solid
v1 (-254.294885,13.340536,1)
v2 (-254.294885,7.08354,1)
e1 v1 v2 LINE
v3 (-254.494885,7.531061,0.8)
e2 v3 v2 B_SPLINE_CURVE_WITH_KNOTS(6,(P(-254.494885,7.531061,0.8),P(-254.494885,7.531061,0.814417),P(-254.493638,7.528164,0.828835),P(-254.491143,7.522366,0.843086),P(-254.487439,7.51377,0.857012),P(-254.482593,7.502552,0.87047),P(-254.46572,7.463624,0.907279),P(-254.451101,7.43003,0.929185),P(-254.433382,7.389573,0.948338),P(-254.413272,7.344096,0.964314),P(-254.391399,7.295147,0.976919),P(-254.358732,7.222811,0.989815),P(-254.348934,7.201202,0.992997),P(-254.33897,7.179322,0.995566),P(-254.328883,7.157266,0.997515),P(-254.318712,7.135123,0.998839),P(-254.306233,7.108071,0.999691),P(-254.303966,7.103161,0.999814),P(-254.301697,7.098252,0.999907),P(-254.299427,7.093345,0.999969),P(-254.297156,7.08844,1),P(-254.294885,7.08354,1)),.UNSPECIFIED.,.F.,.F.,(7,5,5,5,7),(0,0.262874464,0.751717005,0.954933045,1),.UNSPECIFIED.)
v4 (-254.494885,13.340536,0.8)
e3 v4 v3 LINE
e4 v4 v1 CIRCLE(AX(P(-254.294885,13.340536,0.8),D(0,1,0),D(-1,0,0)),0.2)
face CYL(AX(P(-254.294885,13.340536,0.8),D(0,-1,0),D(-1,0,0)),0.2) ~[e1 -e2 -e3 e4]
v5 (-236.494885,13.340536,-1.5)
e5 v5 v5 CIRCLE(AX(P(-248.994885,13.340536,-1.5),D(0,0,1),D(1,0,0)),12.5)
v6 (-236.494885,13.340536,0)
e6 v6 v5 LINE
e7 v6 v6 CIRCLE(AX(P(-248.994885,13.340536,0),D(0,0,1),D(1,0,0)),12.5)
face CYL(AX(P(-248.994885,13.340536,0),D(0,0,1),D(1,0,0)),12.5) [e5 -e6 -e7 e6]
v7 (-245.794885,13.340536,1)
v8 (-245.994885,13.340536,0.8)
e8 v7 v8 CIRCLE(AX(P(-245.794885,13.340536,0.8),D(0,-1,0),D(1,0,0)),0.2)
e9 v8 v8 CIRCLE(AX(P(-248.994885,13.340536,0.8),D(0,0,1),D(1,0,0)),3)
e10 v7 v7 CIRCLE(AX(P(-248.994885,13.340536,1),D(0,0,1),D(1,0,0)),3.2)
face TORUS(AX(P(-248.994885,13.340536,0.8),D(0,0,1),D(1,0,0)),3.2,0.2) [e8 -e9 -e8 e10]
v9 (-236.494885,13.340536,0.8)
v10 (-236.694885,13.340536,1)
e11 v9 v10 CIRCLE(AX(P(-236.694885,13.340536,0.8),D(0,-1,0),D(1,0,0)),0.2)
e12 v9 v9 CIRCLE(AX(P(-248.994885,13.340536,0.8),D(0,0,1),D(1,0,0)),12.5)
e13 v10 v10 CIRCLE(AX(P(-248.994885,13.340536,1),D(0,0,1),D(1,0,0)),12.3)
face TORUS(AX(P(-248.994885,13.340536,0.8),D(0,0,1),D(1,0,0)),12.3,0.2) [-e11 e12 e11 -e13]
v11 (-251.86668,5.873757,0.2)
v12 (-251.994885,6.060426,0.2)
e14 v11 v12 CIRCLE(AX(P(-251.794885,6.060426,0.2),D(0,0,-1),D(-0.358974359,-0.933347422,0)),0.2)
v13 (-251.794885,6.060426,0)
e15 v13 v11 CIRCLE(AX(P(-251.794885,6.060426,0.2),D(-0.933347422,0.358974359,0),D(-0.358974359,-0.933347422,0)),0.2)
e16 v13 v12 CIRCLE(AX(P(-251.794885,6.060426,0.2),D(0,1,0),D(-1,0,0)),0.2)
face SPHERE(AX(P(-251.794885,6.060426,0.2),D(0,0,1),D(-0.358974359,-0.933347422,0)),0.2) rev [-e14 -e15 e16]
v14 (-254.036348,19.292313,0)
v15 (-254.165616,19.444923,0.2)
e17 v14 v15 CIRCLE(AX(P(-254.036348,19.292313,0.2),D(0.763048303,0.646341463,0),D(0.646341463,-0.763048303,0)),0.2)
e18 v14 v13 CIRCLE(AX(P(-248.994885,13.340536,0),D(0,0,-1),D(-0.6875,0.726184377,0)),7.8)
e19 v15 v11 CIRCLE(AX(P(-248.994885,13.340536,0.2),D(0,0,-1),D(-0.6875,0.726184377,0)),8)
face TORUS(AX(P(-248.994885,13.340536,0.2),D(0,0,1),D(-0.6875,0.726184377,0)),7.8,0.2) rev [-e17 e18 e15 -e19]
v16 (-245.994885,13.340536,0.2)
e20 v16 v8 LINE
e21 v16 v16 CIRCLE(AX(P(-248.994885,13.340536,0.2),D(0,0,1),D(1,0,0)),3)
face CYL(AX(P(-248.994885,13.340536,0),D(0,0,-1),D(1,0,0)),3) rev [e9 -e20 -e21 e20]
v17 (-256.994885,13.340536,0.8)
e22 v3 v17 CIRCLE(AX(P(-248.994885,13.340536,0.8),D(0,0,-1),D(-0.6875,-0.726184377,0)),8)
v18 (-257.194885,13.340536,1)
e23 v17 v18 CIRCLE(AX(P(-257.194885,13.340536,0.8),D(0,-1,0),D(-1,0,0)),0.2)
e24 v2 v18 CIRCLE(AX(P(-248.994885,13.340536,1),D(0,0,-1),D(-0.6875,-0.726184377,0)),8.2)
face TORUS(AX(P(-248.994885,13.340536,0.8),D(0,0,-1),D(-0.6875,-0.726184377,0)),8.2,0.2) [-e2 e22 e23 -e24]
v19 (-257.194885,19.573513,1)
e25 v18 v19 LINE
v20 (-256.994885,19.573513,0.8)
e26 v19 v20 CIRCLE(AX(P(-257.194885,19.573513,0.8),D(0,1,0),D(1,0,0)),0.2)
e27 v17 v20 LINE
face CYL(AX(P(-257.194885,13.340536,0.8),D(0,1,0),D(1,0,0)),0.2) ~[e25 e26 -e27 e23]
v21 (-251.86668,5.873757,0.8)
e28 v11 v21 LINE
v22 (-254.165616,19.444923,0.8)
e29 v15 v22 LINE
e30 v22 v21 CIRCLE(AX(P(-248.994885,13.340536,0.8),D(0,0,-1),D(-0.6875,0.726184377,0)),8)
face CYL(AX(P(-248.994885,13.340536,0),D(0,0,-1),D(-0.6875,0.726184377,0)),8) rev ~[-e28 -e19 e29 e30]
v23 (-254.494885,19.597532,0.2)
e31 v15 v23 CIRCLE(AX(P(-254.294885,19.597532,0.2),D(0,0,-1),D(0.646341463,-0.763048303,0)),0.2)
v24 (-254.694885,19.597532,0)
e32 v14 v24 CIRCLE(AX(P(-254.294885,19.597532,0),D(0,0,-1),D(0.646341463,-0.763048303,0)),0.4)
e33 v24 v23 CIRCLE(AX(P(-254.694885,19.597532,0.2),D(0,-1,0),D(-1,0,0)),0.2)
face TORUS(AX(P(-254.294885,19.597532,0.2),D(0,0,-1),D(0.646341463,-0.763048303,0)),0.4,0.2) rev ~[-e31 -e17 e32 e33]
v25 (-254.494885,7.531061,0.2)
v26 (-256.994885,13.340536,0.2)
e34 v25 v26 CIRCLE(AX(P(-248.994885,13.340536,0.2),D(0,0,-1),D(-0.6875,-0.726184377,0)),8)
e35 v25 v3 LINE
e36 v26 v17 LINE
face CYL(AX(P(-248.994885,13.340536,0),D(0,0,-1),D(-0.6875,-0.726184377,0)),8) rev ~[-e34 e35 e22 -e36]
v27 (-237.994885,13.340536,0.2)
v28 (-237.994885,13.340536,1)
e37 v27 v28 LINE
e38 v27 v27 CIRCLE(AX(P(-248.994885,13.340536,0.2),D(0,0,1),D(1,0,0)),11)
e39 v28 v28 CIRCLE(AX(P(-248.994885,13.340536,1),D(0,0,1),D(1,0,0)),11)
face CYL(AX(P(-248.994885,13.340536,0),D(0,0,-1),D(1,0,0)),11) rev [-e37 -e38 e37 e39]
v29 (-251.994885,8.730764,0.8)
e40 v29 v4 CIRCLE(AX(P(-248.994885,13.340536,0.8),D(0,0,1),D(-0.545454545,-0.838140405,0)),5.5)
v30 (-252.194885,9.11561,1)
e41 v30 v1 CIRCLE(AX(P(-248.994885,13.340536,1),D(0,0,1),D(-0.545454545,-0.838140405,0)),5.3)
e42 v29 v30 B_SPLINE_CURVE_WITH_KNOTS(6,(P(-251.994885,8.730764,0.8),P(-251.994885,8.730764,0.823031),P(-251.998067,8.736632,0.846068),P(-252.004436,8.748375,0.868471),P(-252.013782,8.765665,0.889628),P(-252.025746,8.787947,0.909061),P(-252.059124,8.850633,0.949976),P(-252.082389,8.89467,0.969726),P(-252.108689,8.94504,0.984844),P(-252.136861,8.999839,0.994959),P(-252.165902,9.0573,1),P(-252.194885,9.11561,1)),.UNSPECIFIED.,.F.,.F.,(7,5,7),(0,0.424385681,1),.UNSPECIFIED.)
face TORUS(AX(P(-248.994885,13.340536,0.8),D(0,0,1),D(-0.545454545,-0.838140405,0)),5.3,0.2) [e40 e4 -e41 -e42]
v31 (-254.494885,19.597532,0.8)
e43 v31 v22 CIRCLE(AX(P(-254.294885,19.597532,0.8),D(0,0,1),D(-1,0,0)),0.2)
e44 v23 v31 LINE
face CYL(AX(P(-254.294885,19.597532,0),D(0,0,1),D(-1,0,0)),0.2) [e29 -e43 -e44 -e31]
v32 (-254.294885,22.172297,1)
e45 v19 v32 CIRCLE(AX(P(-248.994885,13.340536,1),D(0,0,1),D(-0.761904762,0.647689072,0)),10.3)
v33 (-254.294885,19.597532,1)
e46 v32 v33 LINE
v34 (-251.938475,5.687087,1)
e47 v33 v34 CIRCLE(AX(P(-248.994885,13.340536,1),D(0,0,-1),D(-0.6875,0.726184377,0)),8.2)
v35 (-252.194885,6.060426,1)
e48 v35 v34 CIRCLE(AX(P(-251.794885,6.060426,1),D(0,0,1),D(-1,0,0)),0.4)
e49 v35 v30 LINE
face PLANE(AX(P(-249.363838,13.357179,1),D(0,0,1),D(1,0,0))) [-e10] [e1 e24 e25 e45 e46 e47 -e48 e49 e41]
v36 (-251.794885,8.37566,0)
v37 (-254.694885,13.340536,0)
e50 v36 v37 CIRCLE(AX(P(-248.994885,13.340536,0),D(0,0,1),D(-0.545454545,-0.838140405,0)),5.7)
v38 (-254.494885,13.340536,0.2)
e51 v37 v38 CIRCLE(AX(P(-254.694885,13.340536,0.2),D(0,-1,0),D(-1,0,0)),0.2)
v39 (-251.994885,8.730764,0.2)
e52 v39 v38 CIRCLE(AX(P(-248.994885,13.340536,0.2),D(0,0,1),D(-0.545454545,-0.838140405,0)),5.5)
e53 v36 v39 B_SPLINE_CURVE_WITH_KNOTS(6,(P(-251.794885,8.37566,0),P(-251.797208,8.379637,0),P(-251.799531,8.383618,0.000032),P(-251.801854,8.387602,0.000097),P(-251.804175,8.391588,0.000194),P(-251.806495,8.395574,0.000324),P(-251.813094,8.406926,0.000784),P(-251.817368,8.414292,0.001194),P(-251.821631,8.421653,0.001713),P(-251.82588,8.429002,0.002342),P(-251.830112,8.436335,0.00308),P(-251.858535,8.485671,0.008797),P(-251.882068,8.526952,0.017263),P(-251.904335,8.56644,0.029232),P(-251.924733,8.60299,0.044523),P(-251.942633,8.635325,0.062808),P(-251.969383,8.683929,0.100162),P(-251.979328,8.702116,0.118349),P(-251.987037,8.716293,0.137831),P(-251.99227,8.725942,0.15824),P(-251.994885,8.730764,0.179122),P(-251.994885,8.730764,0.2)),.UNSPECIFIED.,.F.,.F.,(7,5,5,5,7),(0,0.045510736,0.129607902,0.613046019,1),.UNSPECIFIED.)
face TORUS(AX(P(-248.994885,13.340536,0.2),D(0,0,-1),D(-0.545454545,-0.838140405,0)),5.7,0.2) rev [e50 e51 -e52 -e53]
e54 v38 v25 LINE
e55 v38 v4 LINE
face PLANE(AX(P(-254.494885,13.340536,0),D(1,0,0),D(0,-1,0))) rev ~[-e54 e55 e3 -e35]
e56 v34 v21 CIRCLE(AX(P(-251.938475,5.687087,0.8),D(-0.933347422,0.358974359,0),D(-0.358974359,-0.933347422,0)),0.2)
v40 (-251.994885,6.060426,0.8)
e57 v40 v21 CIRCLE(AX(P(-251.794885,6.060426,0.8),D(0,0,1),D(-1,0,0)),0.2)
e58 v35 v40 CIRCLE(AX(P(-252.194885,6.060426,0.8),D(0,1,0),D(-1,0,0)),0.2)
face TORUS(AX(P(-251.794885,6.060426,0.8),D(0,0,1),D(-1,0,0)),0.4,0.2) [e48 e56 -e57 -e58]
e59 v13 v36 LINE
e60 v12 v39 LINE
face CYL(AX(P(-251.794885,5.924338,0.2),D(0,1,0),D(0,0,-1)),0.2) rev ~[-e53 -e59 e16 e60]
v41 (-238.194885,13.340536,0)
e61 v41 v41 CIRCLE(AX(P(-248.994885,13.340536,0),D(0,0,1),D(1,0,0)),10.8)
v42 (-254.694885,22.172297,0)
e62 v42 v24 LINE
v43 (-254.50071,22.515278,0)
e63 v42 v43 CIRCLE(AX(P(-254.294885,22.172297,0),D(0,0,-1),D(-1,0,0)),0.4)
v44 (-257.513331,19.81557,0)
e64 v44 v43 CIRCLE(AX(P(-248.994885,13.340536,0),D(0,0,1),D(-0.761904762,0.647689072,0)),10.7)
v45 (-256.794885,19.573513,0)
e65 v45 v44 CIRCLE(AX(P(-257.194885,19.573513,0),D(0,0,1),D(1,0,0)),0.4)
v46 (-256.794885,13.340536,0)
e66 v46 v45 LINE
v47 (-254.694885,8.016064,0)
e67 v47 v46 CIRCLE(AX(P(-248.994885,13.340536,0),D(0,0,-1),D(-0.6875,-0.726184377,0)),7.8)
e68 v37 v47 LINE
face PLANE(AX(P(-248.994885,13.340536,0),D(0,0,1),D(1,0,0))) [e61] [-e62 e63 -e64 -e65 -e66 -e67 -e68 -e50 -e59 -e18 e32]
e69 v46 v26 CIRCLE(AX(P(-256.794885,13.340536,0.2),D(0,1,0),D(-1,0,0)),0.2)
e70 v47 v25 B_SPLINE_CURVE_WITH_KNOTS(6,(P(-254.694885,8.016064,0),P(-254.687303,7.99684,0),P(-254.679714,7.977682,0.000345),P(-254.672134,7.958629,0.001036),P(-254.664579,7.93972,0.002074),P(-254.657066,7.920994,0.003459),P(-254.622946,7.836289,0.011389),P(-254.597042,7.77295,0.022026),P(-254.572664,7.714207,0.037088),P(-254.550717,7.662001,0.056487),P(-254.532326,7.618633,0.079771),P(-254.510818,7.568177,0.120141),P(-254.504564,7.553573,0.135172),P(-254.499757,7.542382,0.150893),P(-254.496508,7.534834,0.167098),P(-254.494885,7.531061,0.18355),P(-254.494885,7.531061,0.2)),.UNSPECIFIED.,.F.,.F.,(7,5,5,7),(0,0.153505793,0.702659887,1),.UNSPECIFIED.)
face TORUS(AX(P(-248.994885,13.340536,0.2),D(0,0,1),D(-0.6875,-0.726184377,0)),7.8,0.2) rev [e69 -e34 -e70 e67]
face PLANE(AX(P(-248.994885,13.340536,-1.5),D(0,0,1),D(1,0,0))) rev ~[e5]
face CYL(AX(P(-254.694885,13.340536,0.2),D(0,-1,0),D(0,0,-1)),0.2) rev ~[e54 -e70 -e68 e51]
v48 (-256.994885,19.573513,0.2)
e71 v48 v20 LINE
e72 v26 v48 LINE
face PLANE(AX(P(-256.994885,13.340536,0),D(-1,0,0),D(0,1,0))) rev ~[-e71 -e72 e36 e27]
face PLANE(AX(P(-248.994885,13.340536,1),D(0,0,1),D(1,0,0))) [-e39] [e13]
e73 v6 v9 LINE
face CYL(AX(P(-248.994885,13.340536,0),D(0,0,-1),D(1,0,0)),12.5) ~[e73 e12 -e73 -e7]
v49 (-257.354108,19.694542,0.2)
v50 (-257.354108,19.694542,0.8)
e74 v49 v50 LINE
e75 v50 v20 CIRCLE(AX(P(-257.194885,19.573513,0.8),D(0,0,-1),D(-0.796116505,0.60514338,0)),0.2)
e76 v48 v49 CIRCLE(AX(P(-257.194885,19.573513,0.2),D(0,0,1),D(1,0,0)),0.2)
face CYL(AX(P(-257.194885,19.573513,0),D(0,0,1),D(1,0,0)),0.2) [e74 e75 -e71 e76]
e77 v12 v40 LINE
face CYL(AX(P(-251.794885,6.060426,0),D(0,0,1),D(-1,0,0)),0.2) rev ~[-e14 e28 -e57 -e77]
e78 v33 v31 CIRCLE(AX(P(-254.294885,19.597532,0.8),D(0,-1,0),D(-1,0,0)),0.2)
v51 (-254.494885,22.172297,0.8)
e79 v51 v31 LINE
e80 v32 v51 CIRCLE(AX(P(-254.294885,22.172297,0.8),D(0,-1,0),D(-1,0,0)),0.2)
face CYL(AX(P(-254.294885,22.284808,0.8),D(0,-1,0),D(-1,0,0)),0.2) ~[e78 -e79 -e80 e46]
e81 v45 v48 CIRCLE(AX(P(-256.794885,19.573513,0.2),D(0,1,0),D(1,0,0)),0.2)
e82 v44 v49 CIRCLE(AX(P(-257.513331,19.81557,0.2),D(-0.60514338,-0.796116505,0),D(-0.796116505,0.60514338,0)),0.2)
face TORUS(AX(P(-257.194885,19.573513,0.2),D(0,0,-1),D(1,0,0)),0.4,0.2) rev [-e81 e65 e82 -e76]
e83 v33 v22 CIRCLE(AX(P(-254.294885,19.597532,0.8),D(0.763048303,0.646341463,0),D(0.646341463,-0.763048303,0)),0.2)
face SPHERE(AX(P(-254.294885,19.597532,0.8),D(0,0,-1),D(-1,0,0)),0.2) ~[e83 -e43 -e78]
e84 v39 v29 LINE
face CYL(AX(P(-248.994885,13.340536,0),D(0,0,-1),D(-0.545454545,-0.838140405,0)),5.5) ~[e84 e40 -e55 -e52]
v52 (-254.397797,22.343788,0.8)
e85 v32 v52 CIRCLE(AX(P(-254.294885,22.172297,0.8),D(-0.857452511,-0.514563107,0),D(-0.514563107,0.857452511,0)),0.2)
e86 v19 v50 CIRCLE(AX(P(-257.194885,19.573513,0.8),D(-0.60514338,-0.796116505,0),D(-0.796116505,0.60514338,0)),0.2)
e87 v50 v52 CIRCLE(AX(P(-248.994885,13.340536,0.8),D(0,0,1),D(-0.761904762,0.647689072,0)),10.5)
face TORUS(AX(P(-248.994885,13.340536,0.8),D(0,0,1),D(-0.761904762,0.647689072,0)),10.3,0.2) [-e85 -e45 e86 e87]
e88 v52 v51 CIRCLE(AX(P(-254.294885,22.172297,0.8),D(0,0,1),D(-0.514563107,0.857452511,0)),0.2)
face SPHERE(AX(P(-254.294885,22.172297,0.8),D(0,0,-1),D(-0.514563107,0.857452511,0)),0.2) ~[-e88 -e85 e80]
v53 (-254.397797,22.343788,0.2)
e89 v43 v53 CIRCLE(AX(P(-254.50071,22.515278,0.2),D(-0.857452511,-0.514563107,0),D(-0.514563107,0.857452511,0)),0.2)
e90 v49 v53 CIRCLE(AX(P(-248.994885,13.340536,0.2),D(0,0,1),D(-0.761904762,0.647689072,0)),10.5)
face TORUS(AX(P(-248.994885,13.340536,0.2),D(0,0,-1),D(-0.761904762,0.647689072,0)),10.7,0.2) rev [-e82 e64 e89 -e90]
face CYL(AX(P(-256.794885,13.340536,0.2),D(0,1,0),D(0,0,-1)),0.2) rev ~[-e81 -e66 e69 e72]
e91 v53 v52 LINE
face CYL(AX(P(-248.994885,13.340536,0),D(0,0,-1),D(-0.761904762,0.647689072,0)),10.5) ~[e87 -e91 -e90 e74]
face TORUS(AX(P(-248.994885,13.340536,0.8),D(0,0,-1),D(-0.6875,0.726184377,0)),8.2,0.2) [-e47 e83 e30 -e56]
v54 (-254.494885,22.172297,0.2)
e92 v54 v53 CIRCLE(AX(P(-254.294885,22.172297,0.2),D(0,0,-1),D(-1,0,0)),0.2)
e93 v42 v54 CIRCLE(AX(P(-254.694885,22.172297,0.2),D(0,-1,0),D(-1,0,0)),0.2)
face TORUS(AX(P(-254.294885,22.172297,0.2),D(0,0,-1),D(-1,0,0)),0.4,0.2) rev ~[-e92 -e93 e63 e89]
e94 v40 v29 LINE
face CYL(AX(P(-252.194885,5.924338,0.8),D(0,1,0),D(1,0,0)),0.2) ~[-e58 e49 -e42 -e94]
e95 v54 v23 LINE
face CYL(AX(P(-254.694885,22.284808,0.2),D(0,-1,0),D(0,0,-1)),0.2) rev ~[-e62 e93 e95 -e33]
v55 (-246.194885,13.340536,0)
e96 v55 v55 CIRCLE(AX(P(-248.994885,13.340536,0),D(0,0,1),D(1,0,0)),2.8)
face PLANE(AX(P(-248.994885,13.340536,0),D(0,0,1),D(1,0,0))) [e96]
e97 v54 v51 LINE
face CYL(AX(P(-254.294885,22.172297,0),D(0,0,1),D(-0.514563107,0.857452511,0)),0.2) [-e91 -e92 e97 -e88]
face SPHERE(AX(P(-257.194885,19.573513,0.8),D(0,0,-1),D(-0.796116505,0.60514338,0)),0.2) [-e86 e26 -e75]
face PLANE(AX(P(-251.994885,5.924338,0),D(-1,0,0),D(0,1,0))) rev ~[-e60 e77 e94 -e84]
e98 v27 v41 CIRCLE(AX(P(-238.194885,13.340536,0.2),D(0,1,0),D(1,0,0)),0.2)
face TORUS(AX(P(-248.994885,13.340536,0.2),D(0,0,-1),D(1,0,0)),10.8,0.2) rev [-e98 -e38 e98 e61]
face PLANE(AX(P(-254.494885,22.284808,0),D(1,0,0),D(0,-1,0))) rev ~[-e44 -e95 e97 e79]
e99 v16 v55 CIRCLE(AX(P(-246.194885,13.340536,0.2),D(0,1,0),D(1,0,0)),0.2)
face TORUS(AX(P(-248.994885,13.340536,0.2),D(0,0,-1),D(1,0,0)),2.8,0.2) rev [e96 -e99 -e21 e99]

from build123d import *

# Parameters (mm, degrees)
F0_R     = 12.5
F0_R_2   = 11
F0_R_3   = 3
F1_DEPTH = 1.5
F2_DEPTH = 1
F3_R     = 0.2


with BuildPart() as f1:
    # F0 (on Top) → F1 (new body)
    with BuildSketch(Plane.XY):
        with Locations((-248.9948847865, 13.3405361525)):
            Circle(F0_R)
        with Locations((-248.9948847865, 13.3405361525)):
            Circle(F0_R_2, mode=Mode.SUBTRACT)
        with Locations((-248.9948847865, 13.3405361525)):
            Circle(F0_R_2)
        with BuildLine():
            ThreePointArc((-254.4948847865, 13.3405361525), (-244.1601148851, 15.9625582729), (-251.9948847865, 8.7307639238))
            Line((-251.9948847865, 8.7307639238), (-251.9948847865, 5.9243376654))
            ThreePointArc((-251.9948847865, 5.9243376654), (-241.1340890301, 14.8264332134), (-254.4948847865, 19.1500111718))
            Line((-254.4948847865, 19.1500111718), (-254.4948847865, 22.2848080625))
            ThreePointArc((-254.4948847865, 22.2848080625), (-242.1603264724, 5.3694124769), (-256.9948847865, 20.1412714069))
            Line((-256.9948847865, 20.1412714069), (-256.9948847865, 13.3405361525))
            ThreePointArc((-256.9948847865, 13.3405361525), (-256.3433540149, 10.1782584923), (-254.4948847865, 7.5310611332))
            Line((-254.4948847865, 7.5310611332), (-254.4948847865, 13.3405361525))
        make_face(mode=Mode.SUBTRACT)
        with BuildLine():
            Line((-251.9948847865, 5.9243376654), (-251.9948847865, 8.7307639238))
            ThreePointArc((-251.9948847865, 8.7307639238), (-244.1601148851, 15.9625582729), (-254.4948847865, 13.3405361525))
            Line((-254.4948847865, 13.3405361525), (-254.4948847865, 7.5310611332))
            ThreePointArc((-254.4948847865, 7.5310611332), (-256.3433540149, 10.1782584923), (-256.9948847865, 13.3405361525))
            Line((-256.9948847865, 13.3405361525), (-256.9948847865, 20.1412714069))
            ThreePointArc((-256.9948847865, 20.1412714069), (-242.1603264724, 5.3694124769), (-254.4948847865, 22.2848080625))
            Line((-254.4948847865, 22.2848080625), (-254.4948847865, 19.1500111718))
            ThreePointArc((-254.4948847865, 19.1500111718), (-241.1340890301, 14.8264332134), (-251.9948847865, 5.9243376654))
        make_face()
        with Locations((-248.9948847865, 13.3405361525)):
            Circle(F0_R_3, mode=Mode.SUBTRACT)
        with Locations((-248.9948847865, 13.3405361525)):
            Circle(F0_R_3)
    extrude(amount=-F1_DEPTH)

    # F0 (on Top) → F2 (join)
    with BuildSketch(Plane.XY):
        with Locations((-248.9948847865, 13.3405361525)):
            Circle(F0_R)
        with Locations((-248.9948847865, 13.3405361525)):
            Circle(F0_R_2, mode=Mode.SUBTRACT)
        with BuildLine():
            Line((-251.9948847865, 5.9243376654), (-251.9948847865, 8.7307639238))
            ThreePointArc((-251.9948847865, 8.7307639238), (-244.1601148851, 15.9625582729), (-254.4948847865, 13.3405361525))
            Line((-254.4948847865, 13.3405361525), (-254.4948847865, 7.5310611332))
            ThreePointArc((-254.4948847865, 7.5310611332), (-256.3433540149, 10.1782584923), (-256.9948847865, 13.3405361525))
            Line((-256.9948847865, 13.3405361525), (-256.9948847865, 20.1412714069))
            ThreePointArc((-256.9948847865, 20.1412714069), (-242.1603264724, 5.3694124769), (-254.4948847865, 22.2848080625))
            Line((-254.4948847865, 22.2848080625), (-254.4948847865, 19.1500111718))
            ThreePointArc((-254.4948847865, 19.1500111718), (-241.1340890301, 14.8264332134), (-251.9948847865, 5.9243376654))
        make_face()
        with Locations((-248.9948847865, 13.3405361525)):
            Circle(F0_R_3, mode=Mode.SUBTRACT)
    extrude(amount=F2_DEPTH)

    # F3
    f3_edges = [f1.edges().sort_by_distance(p)[0] for p in [
        (-261.494885, 13.340536, 1),
        (-256.994885, 16.740904, 1),
        (-256.343354, 10.178258, 1),
        (-254.494885, 20.71741, 1),
        (-254.494885, 10.435799, 1),
        (-251.994885, 7.327551, 1),
        (-251.994885, 13.340536, 0),
        (-241.134089, 14.826433, 0),
        (-244.160115, 15.962558, 0),
        (-254.494885, 10.435799, 0),
        (-254.494885, 20.71741, 0),
        (-259.994885, 13.340536, 0),
        (-242.160326, 5.369412, 0),
        (-251.994885, 13.340536, 1),
        (-241.134089, 14.826433, 1),
        (-251.994885, 7.327551, 0),
        (-251.994885, 5.924338, 0.5),
        (-254.494885, 19.150011, 0.5),
        (-254.494885, 22.284808, 0.5),
        (-256.994885, 20.141271, 0.5),
        (-244.160115, 15.962558, 1),
        (-242.160326, 5.369412, 1),
        (-256.343354, 10.178258, 0),
        (-256.994885, 16.740904, 0),
    ]]
    fillet(f3_edges, radius=F3_R)


solid = f1.part
